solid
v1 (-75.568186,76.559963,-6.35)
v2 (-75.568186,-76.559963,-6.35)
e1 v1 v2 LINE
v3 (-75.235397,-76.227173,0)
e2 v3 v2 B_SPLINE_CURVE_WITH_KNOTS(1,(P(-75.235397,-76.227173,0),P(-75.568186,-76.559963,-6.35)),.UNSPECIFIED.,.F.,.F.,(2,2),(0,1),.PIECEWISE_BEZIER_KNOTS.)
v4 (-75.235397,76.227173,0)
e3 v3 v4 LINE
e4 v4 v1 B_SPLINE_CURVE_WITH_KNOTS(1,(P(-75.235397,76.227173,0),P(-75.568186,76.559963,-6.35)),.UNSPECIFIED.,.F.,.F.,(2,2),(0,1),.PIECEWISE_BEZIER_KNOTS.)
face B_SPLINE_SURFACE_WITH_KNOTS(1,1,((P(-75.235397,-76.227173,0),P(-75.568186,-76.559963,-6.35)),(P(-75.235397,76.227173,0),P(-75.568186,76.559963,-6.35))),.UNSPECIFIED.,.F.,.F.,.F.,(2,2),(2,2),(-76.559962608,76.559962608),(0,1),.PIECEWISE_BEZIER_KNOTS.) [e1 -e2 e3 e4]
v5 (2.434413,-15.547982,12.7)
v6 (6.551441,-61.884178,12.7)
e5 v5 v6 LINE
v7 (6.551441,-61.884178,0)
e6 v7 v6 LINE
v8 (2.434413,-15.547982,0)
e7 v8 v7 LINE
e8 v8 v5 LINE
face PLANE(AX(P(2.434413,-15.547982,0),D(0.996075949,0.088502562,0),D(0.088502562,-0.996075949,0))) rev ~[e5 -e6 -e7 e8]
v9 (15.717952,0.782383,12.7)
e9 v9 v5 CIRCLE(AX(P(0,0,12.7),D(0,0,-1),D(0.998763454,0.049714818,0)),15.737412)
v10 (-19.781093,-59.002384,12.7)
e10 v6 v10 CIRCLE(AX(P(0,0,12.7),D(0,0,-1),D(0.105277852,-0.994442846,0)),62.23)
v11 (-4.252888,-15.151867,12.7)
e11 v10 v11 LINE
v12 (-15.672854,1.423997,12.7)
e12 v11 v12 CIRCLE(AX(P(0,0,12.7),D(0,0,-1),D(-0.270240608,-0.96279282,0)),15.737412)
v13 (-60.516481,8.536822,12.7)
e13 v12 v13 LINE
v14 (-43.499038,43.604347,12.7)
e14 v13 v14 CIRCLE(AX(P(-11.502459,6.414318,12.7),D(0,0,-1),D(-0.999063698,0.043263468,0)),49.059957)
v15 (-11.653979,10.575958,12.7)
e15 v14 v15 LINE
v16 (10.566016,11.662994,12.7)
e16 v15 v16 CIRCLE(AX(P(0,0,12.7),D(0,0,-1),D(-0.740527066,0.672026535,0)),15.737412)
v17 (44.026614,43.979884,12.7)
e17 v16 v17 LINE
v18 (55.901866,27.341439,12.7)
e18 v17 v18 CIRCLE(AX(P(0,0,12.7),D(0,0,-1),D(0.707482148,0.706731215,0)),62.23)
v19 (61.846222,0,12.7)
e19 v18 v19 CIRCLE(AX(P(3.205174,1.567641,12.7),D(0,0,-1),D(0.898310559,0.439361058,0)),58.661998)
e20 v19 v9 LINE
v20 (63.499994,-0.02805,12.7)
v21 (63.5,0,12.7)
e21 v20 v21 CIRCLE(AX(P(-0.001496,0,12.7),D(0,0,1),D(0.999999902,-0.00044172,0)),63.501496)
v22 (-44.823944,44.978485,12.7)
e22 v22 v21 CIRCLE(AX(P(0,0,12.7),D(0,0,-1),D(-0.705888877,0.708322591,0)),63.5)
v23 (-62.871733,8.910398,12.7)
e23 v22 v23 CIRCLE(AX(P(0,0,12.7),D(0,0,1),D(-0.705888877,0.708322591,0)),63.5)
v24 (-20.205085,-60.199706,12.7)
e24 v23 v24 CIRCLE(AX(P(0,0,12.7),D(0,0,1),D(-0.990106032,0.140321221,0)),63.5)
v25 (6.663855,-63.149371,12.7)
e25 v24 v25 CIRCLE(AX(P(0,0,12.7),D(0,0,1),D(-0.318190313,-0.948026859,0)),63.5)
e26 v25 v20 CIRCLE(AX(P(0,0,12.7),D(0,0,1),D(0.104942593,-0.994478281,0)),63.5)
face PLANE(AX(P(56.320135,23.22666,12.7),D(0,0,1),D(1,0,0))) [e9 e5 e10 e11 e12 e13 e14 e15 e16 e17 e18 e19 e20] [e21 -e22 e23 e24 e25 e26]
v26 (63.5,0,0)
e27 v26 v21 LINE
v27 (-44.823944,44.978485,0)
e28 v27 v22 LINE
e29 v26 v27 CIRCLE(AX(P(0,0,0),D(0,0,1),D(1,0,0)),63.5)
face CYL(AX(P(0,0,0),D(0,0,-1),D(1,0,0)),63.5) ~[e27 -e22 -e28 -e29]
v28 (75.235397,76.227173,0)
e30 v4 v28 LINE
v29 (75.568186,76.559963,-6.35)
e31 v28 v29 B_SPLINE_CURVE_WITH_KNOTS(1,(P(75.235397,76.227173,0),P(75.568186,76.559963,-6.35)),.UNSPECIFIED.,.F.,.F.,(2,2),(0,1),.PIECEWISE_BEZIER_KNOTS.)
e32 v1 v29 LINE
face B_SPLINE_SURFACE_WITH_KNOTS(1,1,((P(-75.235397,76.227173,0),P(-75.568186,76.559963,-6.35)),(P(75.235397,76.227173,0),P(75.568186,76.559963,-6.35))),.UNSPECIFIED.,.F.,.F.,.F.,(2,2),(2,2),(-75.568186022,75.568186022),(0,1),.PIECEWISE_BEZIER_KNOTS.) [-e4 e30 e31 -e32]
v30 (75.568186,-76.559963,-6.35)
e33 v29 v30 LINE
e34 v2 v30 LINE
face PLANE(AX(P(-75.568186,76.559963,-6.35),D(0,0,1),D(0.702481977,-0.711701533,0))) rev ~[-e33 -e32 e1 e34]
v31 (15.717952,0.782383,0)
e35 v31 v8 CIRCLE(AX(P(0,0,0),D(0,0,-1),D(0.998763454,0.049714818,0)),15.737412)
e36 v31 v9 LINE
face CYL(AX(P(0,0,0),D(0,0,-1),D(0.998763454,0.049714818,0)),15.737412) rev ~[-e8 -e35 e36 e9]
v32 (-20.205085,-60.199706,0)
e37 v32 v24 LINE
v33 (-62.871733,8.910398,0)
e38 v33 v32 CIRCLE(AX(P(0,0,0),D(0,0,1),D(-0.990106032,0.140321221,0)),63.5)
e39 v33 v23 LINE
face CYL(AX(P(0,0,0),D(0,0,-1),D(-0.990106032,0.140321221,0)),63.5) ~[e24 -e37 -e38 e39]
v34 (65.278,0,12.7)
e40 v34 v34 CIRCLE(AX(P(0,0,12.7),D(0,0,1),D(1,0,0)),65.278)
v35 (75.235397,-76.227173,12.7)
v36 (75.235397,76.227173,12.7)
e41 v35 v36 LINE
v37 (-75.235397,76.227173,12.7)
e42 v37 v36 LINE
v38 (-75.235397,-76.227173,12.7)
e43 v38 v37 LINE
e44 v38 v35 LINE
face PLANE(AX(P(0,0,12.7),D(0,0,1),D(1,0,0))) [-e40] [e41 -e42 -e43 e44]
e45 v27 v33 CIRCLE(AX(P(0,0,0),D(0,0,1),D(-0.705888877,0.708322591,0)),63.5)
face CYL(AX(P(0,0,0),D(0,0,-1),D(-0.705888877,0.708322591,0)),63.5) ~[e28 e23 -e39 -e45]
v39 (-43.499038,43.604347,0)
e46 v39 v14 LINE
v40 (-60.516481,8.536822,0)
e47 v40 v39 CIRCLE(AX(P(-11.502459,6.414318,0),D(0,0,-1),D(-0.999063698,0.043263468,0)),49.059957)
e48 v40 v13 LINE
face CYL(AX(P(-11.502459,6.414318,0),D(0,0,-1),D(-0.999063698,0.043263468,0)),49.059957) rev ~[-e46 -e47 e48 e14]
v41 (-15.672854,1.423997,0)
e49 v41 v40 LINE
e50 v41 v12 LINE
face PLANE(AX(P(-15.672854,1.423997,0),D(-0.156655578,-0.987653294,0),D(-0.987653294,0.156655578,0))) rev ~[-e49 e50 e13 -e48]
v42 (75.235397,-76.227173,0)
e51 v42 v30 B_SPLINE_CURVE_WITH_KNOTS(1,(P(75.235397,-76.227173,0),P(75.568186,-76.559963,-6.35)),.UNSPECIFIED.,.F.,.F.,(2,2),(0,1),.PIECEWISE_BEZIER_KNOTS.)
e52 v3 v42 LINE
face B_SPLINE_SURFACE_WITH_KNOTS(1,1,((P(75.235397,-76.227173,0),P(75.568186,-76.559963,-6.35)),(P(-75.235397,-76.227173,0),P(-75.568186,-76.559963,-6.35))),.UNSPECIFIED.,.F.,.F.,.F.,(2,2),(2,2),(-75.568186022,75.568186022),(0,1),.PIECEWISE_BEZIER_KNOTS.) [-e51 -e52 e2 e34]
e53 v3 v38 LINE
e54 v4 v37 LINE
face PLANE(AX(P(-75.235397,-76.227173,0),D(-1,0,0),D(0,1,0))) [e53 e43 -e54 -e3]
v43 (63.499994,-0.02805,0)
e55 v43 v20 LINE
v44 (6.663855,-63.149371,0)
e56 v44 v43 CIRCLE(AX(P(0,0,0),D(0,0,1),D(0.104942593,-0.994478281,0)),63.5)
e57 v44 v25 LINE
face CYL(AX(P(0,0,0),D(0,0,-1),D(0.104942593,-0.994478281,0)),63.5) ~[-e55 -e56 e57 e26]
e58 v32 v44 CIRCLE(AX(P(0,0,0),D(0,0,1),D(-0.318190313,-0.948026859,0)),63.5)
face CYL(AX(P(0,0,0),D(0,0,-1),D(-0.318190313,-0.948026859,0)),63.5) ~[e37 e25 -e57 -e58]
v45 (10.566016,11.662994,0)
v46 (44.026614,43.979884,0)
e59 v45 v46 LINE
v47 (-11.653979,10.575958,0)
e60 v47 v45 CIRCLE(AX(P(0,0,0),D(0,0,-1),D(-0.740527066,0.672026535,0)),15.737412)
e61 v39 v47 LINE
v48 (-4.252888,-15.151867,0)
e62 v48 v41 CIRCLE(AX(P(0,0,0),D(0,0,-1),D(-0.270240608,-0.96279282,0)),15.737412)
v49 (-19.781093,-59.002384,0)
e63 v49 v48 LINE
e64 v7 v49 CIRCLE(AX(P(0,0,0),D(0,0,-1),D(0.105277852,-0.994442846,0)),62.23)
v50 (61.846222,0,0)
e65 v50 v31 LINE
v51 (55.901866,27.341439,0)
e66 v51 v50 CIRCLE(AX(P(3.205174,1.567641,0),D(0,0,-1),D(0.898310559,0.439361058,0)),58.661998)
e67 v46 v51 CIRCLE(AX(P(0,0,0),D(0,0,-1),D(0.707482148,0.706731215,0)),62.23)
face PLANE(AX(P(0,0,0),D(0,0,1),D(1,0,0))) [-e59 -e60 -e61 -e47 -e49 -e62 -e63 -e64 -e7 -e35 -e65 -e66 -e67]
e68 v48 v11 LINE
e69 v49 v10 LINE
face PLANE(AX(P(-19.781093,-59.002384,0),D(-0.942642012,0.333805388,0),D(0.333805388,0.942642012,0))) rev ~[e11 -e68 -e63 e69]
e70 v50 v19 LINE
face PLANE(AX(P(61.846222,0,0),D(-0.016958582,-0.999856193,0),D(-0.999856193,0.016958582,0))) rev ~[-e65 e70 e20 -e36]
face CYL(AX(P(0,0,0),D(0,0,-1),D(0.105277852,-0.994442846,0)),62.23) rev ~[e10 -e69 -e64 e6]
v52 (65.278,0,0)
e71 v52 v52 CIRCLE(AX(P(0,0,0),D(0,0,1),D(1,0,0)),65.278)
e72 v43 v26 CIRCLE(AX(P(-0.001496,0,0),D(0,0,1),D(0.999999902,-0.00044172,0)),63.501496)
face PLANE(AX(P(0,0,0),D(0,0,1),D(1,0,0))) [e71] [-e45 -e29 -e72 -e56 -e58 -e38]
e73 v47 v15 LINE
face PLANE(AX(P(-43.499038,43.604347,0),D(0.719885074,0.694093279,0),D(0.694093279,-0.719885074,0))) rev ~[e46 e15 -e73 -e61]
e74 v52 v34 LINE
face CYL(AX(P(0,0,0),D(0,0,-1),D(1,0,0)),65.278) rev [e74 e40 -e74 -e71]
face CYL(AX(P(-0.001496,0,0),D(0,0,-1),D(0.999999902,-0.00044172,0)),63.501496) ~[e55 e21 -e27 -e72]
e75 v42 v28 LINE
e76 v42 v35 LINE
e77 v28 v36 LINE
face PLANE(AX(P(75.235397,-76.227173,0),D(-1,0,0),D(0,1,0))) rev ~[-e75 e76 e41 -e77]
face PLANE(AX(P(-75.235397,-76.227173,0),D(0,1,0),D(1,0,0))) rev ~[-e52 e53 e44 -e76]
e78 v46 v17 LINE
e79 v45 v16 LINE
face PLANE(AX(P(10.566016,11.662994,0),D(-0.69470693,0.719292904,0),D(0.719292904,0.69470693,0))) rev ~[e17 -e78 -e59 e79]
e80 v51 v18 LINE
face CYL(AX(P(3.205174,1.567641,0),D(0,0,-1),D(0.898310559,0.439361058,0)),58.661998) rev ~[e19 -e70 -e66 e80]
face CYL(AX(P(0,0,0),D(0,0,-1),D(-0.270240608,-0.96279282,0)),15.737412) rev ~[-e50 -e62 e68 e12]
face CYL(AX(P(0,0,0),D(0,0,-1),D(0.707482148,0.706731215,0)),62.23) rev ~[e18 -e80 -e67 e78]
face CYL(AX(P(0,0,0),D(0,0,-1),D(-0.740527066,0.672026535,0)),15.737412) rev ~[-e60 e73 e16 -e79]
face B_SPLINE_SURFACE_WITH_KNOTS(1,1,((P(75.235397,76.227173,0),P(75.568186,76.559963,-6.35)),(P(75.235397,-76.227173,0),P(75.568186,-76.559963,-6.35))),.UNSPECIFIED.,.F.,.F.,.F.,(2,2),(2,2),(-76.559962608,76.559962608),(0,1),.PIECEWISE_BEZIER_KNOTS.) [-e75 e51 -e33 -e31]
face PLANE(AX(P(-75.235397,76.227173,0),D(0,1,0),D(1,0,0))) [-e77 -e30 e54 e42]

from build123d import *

# Parameters (mm, degrees)
F1_DEPTH  = 12.7
F0_R      = 72.898
F0_R_2    = 65.278
F2_DEPTH  = 12.7
F4_R      = 72.898
F5_DEPTH  = 6.35
F6_DEPTH  = 12.7
F8_W      = 150.4707932472
F8_H      = 152.4543464184
F8_R      = 72.898
F9_DEPTH  = 12.7
F9_FACE_W = 150.4707932472
F9_FACE_H = 152.4543464184
F9_FACE_R = 72.898
F12_DEPTH = 6.35
F12_TAPER = -3


# Not quite as in the source:
# - the program builds the solid bodies; features that only make, move or delete a surface that nothing else refers to are left out


with BuildPart() as f1:
    # F0 (on Top) → F1 (new body)
    with BuildSketch(Plane.XY):
        with BuildLine():
            Line((44.0266140713, 43.9798835084), (44.9402432342, 44.8622841377))
            ThreePointArc((44.9402432342, 44.8622841377), (0.0822011404, 63.499946795), (-44.8239437094, 44.9784845269))
            Line((-44.8239437094, 44.9784845269), (-43.499038361, 43.6043470536))
            Line((-43.499038361, 43.6043470536), (-11.6539793168, 10.5759582539))
            ThreePointArc((-11.6539793168, 10.5759582539), (-0.7689783294, 15.718613146), (10.5660161344, 11.662994039))
            Line((10.5660161344, 11.662994039), (44.0266140713, 43.9798835084))
        make_face()
    extrude(amount=F1_DEPTH)



with BuildPart() as f1b:
    # F0 (on Top) → F1, piece 2 (new body)
    with BuildSketch(Plane.XY):
        with BuildLine():
            ThreePointArc((6.6638546501, -63.1493708694), (47.1891587684, -42.4903906164), (63.4999938049, -0.0280496613))
            Line((63.4999938049, -0.0280496613), (61.8462218281, 0))
            Line((61.8462218281, 0), (15.7179516616, 0.78238256))
            ThreePointArc((15.7179516616, 0.78238256), (12.2084926851, -9.9307015494), (2.4344132667, -15.5479824721))
            Line((2.4344132667, -15.5479824721), (6.5514407483, -61.8841783021))
            Line((6.5514407483, -61.8841783021), (6.6638546501, -63.1493708694))
        make_face()
    extrude(amount=F1_DEPTH)


with BuildPart() as f1c:
    # F0 (on Top) → F1, piece 3 (new body)
    with BuildSketch(Plane.XY):
        with BuildLine():
            Line((-60.5164809282, 8.5368217163), (-62.8717330434, 8.9103975287))
            ThreePointArc((-62.8717330434, 8.9103975287), (-54.0323144536, -33.3580424304), (-20.2050848869, -60.1997055202))
            Line((-20.2050848869, -60.1997055202), (-19.7810930248, -59.0023835005))
            Line((-19.7810930248, -59.0023835005), (-4.2528877081, -15.1518669823))
            ThreePointArc((-4.2528877081, -15.1518669823), (-12.9594991488, -8.928466202), (-15.6728541768, 1.4239974924))
            Line((-15.6728541768, 1.4239974924), (-60.5164809282, 8.5368217163))
        make_face()
    extrude(amount=F1_DEPTH)


with BuildPart() as f2:
    # F0 (on Top) → F2 (new body)
    with BuildSketch(Plane.XY):
        Circle(F0_R)
        Circle(F0_R_2, mode=Mode.SUBTRACT)
    extrude(amount=F2_DEPTH)


with BuildPart() as f1_1:
    add(f1.part)

    add(f1b.part)  # F5 merges F1b

    add(f1c.part)  # F5 merges F1c

    add(f2.part)  # F5 merges F2
    # F4 (on Top) → F5 (join)
    with BuildSketch(Plane.XY):
        Circle(F4_R)
    extrude(amount=-F5_DEPTH)

    # F0 (on Top) → F6 (join)
    with BuildSketch(Plane.XY):
        with BuildLine():
            ThreePointArc((63.4999938049, -0.0280496613), (63.4999984512, -0.014024831), (63.5, 0))
            ThreePointArc((63.5, 0), (58.6768925787, 24.2749310465), (44.9402432342, 44.8622841377))
            Line((44.9402432342, 44.8622841377), (44.0266140713, 43.9798835084))
            ThreePointArc((44.0266140713, 43.9798835084), (50.6520952134, 36.1515995564), (55.9018661031, 27.3414386269))
            ThreePointArc((55.9018661031, 27.3414386269), (60.528045967, 14.0303191282), (61.8462218281, 0))
            Line((61.8462218281, 0), (63.4999938049, -0.0280496613))
        make_face()
        with BuildLine():
            Line((44.0266140713, 43.9798835084), (44.9402432342, 44.8622841377))
            ThreePointArc((44.9402432342, 44.8622841377), (0.0822011404, 63.499946795), (-44.8239437094, 44.9784845269))
            Line((-44.8239437094, 44.9784845269), (-43.499038361, 43.6043470536))
            Line((-43.499038361, 43.6043470536), (-11.6539793168, 10.5759582539))
            ThreePointArc((-11.6539793168, 10.5759582539), (-0.7689783294, 15.718613146), (10.5660161344, 11.662994039))
            Line((10.5660161344, 11.662994039), (44.0266140713, 43.9798835084))
        make_face()
        with BuildLine():
            ThreePointArc((6.6638546501, -63.1493708694), (47.1891587684, -42.4903906164), (63.4999938049, -0.0280496613))
            Line((63.4999938049, -0.0280496613), (61.8462218281, 0))
            Line((61.8462218281, 0), (15.7179516616, 0.78238256))
            ThreePointArc((15.7179516616, 0.78238256), (12.2084926851, -9.9307015494), (2.4344132667, -15.5479824721))
            Line((2.4344132667, -15.5479824721), (6.5514407483, -61.8841783021))
            Line((6.5514407483, -61.8841783021), (6.6638546501, -63.1493708694))
        make_face()
        with BuildLine():
            Line((-43.499038361, 43.6043470536), (-44.8239437094, 44.9784845269))
            ThreePointArc((-44.8239437094, 44.9784845269), (-56.7874671273, 28.4153757192), (-62.8717330434, 8.9103975287))
            Line((-62.8717330434, 8.9103975287), (-60.5164809282, 8.5368217163))
            ThreePointArc((-60.5164809282, 8.5368217163), (-55.6398831968, 27.8331682386), (-43.499038361, 43.6043470536))
        make_face()
        with BuildLine():
            ThreePointArc((-20.2050848869, -60.1997055202), (-6.929383847, -63.1207861128), (6.6638546501, -63.1493708694))
            Line((6.6638546501, -63.1493708694), (6.5514407483, -61.8841783021))
            ThreePointArc((6.5514407483, -61.8841783021), (-6.7699416658, -61.8606562351), (-19.7810930248, -59.0023835005))
            Line((-19.7810930248, -59.0023835005), (-20.2050848869, -60.1997055202))
        make_face()
        with BuildLine():
            Line((-60.5164809282, 8.5368217163), (-62.8717330434, 8.9103975287))
            ThreePointArc((-62.8717330434, 8.9103975287), (-54.0323144536, -33.3580424304), (-20.2050848869, -60.1997055202))
            Line((-20.2050848869, -60.1997055202), (-19.7810930248, -59.0023835005))
            Line((-19.7810930248, -59.0023835005), (-4.2528877081, -15.1518669823))
            ThreePointArc((-4.2528877081, -15.1518669823), (-12.9594991488, -8.928466202), (-15.6728541768, 1.4239974924))
            Line((-15.6728541768, 1.4239974924), (-60.5164809282, 8.5368217163))
        make_face()
    extrude(amount=F6_DEPTH)



with BuildPart() as f6:
    # F0 (on Top) → F6, piece 2 (new body)
    with BuildSketch(Plane.XY):
        Circle(F0_R)
        Circle(F0_R_2, mode=Mode.SUBTRACT)
    extrude(amount=F6_DEPTH)


with BuildPart() as f1_2:
    add(f1_1.part)

    add(f6.part)  # F9 merges F6
    # F8 (on face) → F9 (join)
    with BuildSketch(Plane.XY):
        Rectangle(F8_W, F8_H)
        Circle(F8_R, mode=Mode.SUBTRACT)
    extrude(amount=F9_DEPTH)

    # F9_face (on face) → F12 (join)
    with BuildSketch(Plane(origin=(0, 0, 0), x_dir=(1, 0, 0), z_dir=(0, 0, -1))):
        Rectangle(F9_FACE_W, F9_FACE_H)
        Circle(F9_FACE_R, mode=Mode.SUBTRACT)
    extrude(amount=F12_DEPTH, taper=F12_TAPER)


solid = f1_2.part
